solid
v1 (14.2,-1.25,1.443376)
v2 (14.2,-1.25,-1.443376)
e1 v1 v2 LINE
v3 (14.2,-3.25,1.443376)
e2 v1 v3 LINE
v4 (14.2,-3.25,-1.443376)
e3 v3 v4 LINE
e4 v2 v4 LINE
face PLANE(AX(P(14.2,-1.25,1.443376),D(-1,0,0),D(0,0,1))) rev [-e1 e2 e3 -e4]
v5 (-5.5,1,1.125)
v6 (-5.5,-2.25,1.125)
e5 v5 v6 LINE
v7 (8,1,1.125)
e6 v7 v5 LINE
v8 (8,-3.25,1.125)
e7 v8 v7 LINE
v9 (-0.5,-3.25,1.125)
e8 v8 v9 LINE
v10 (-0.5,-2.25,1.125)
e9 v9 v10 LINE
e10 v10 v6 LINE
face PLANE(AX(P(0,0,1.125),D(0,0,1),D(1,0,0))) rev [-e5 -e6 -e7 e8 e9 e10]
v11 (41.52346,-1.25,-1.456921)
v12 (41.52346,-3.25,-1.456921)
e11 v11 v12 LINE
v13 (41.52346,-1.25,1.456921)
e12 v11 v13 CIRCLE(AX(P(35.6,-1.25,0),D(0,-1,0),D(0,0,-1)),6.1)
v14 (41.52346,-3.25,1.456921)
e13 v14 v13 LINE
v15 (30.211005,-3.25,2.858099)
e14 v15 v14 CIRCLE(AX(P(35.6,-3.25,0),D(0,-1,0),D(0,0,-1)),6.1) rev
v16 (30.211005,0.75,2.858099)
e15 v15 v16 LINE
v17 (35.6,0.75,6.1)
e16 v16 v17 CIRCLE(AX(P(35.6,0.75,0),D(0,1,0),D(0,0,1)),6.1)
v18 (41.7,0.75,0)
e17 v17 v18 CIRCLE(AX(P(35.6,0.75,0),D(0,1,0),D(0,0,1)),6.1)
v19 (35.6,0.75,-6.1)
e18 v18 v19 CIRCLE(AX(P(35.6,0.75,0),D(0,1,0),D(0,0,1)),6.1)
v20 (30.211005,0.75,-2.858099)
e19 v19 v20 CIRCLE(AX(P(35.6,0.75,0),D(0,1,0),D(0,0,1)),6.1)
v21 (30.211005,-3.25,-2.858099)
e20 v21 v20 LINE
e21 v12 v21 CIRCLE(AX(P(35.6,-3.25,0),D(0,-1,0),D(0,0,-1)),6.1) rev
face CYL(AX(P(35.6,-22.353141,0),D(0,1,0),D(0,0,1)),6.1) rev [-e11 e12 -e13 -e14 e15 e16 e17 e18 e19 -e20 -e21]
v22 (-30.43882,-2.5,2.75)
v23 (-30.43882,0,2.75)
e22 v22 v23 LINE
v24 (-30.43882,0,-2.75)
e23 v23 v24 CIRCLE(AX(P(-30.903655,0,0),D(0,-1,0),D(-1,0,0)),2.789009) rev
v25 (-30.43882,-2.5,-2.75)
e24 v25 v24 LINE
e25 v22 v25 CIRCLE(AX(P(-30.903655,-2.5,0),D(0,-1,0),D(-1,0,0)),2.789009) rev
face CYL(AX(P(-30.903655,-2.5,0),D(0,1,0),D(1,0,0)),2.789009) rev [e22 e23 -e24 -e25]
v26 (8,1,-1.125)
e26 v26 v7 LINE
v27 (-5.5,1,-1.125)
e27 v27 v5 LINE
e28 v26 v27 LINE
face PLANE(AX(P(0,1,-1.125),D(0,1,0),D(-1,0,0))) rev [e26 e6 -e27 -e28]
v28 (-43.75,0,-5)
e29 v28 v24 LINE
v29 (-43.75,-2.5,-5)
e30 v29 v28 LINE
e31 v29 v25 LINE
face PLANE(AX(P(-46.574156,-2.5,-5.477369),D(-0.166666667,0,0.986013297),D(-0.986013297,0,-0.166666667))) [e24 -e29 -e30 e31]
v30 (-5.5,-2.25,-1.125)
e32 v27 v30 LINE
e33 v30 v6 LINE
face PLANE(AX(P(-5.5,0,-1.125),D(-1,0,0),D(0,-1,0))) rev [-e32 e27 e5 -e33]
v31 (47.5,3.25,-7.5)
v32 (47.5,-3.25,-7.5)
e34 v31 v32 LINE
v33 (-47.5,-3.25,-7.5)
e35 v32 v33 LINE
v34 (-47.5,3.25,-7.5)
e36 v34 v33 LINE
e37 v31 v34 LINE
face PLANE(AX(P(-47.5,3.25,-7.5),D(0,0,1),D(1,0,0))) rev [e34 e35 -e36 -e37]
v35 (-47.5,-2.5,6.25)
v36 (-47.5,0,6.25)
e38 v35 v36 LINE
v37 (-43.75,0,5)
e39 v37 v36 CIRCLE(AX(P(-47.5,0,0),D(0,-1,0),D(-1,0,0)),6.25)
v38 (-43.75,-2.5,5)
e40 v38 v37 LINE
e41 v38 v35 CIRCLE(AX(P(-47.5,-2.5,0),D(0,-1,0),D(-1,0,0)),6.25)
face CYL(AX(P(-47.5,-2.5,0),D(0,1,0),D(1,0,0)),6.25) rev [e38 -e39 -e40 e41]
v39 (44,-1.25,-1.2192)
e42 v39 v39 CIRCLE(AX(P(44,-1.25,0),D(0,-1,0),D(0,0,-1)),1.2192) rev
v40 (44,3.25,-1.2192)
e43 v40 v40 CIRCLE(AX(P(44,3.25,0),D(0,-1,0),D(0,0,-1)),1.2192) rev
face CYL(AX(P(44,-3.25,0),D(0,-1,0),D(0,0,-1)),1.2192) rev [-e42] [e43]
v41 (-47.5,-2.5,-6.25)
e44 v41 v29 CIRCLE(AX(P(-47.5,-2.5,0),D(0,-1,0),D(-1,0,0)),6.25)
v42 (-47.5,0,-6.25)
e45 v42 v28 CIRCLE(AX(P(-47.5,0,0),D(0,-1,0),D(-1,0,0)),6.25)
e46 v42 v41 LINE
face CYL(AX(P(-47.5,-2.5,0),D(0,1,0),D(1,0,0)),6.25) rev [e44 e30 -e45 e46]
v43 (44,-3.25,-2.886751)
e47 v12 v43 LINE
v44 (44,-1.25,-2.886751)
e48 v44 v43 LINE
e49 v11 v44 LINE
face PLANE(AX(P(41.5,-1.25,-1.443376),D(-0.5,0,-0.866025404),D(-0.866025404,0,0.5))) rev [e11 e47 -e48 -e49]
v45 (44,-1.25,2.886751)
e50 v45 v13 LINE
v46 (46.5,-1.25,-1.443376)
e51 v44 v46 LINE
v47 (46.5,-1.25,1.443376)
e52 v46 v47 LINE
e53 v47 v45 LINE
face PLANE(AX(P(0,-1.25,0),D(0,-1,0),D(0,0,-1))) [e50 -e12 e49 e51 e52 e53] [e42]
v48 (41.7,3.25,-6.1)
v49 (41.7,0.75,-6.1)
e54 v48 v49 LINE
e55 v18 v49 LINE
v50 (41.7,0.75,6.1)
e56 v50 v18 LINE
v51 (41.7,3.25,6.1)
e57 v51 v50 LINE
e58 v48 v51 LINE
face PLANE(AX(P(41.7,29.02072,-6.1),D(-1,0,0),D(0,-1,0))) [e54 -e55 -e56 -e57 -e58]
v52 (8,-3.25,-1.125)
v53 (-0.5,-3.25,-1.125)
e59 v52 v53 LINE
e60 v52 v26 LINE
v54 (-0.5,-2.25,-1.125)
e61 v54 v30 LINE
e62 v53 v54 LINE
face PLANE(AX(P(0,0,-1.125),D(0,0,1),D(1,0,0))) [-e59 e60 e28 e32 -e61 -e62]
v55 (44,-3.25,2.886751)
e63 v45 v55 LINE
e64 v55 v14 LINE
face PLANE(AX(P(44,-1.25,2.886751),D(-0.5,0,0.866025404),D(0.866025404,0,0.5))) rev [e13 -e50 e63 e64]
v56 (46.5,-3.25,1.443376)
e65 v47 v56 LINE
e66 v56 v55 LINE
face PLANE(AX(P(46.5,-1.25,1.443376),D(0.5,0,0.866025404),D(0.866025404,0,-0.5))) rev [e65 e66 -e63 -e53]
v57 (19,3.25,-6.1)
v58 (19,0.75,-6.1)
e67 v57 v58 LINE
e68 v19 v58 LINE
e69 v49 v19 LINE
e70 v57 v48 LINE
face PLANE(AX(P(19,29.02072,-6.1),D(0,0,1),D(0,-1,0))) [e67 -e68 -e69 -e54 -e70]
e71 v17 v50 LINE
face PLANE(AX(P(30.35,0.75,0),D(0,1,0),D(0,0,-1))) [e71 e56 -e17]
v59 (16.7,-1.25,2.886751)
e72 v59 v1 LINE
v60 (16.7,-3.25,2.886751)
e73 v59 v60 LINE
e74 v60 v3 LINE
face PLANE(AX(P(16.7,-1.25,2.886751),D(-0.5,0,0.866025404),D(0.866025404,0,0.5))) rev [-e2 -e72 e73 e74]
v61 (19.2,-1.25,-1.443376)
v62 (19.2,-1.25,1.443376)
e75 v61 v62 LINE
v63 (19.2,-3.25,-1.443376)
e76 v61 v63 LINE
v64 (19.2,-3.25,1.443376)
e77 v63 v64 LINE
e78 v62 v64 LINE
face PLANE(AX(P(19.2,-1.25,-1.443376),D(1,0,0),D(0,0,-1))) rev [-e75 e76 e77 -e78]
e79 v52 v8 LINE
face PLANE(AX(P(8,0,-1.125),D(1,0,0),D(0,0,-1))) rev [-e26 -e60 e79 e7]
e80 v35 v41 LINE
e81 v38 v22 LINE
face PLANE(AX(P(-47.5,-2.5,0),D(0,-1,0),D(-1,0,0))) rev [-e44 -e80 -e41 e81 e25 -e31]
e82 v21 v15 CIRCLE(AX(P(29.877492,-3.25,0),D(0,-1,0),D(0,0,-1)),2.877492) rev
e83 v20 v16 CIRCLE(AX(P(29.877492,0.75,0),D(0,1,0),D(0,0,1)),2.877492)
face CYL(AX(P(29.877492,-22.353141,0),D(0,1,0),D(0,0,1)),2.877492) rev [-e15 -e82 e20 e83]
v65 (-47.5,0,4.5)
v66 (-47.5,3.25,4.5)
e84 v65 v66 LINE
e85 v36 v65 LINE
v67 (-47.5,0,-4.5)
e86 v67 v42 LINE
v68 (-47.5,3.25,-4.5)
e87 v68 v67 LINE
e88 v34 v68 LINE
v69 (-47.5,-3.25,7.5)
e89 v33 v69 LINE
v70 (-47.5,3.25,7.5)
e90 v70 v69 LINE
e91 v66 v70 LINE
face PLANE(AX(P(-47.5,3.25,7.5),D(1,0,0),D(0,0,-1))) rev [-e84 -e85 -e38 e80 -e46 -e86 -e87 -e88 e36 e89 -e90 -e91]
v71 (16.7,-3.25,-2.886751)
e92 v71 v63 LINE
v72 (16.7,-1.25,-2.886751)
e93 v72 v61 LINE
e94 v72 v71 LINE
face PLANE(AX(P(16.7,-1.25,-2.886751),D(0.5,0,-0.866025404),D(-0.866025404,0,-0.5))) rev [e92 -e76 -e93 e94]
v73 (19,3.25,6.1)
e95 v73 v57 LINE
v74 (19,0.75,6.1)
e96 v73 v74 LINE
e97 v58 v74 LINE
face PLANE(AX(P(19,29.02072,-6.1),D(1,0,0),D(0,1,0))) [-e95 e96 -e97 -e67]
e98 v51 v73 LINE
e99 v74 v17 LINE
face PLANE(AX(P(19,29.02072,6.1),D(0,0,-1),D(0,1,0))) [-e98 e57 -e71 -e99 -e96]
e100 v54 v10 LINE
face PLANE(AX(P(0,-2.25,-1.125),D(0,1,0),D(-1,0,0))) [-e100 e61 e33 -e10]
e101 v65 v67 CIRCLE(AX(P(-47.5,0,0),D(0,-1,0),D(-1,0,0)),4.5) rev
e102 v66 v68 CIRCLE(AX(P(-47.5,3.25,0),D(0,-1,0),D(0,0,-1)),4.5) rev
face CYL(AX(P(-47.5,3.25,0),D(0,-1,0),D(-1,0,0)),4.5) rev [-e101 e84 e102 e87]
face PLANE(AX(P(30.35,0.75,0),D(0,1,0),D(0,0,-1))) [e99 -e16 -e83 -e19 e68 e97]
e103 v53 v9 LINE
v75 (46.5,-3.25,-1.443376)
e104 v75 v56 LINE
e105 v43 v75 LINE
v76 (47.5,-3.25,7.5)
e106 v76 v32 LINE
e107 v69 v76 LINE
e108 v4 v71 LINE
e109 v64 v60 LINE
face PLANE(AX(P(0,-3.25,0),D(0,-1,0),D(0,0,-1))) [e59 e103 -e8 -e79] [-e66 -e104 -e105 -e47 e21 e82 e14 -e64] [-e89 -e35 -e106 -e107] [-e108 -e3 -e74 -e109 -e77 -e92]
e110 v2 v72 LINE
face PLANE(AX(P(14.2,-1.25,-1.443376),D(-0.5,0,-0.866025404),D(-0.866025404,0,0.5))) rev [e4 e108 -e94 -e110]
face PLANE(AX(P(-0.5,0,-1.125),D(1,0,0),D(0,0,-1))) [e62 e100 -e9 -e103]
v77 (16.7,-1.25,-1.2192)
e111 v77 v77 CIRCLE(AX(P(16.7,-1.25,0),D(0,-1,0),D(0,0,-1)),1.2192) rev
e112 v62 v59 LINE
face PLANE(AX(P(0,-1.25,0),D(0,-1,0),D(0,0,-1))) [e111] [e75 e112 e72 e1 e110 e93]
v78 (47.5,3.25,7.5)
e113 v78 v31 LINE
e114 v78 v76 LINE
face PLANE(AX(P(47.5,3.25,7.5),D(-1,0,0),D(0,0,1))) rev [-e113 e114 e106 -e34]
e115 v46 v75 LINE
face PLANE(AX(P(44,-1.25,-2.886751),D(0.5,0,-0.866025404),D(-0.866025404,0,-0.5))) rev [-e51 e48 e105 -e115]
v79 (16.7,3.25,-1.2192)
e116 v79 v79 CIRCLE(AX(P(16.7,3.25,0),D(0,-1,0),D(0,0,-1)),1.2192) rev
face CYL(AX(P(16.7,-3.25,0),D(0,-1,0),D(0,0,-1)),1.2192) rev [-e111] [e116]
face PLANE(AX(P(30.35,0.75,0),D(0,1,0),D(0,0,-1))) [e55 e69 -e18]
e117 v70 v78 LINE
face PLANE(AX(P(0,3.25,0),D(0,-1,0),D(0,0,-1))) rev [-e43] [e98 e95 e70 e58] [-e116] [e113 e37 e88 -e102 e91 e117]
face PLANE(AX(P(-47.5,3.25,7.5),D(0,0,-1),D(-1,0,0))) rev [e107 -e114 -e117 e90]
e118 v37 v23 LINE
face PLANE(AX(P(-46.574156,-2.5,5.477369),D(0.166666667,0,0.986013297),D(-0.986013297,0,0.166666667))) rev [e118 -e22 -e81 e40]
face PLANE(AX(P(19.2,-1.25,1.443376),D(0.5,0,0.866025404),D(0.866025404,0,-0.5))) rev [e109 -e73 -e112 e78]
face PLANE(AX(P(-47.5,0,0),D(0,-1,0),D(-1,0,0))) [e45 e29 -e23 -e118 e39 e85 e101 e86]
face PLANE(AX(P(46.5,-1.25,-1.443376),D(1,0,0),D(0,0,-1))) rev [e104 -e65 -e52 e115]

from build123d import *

# Parameters (mm, degrees)
SKETCH2_W                   = 95
SKETCH2_H                   = 15
BOSS_EXTRUDE1_DEPTH         = 3.25
CAVITY1_START               = -2.5
CAVITY1_DEPTH               = 2.5
CAVITY1_START_2             = -1.5
CAVITY1_2_DEPTH             = 4.75
CAVITY1_3_DEPTH             = 1.5
CUT_EXTRUDE1_START          = -5.75
CUT_EXTRUDE1_DEPTH          = 5.75
CUT_EXTRUDE2_START          = -1
CUT_EXTRUDE2_DEPTH          = 1
F_41_0_096_DIAMETER_HOLE1_D = 2.4384
CUT_EXTRUDE4_DEPTH          = 2
CAVITY2_START               = -3.25
CAVITY2_DEPTH               = 6.5
CAVITY2_START_2             = 0.75
CAVITY2_2_DEPTH             = 2.5
SKETCH12_W                  = 22.7
SKETCH12_H                  = 12.2
SKETCH12_W_2                = 22.5
SKETCH12_H_2                = 12
CUT_EXTRUDE6_DEPTH          = 2.5
CUT_EXTRUDE7_START          = -4
CUT_EXTRUDE7_DEPTH          = 4
SKETCH15_W                  = 8.5
SKETCH15_H                  = 4.25
SKETCH15_W_2                = 5
SKETCH15_H_2                = 3.25
CUT_EXTRUDE8_DEPTH          = 1.125


# Read off the part's stored shape, not the designer's step: Cavity1, Cavity2
with BuildPart() as part:
    # Sketch2 → Boss-Extrude1 (new, symmetric)
    with BuildSketch(Plane(origin=(0, 0, 0), x_dir=(1, 0, 0), z_dir=(0, 1, 0))):
        Rectangle(SKETCH2_W, SKETCH2_H)
    extrude(amount=BOSS_EXTRUDE1_DEPTH, both=True)

    # Cavity1 outline → Cavity1 (cut)
    with BuildSketch(Plane(origin=(0, 0, 0), x_dir=(1, 0, 0), z_dir=(0, 1, 0)).offset(CAVITY1_START)):
        with BuildLine():
            ThreePointArc((-47.5, 2.875), (-44.625, 0), (-47.5, -2.875))
            Line((-47.5, -2.875), (-47.5, -3.425))
            ThreePointArc((-47.5, -3.425), (-44.075, 0), (-47.5, 3.425))
            Line((-47.5, 3.425), (-47.5, 2.875))
        make_face()
        with BuildLine():
            Line((-47.5, 6.25), (-47.5, 4.5))
            ThreePointArc((-47.5, 4.5), (-43, 0), (-47.5, -4.5))
            Line((-47.5, -4.5), (-47.5, -6.25))
            ThreePointArc((-47.5, -6.25), (-45.523576462, -5.929270613), (-43.75, -5))
            Line((-43.75, -5), (-30.438820488, -2.75))
            ThreePointArc((-30.438820488, -2.75), (-28.114646288, 0), (-30.438820488, 2.75))
            Line((-30.438820488, 2.75), (-43.75, 5))
            ThreePointArc((-43.75, 5), (-45.523576462, 5.929270613), (-47.5, 6.25))
        make_face()
    extrude(amount=CAVITY1_DEPTH, mode=Mode.SUBTRACT)

    # Cavity1 2 outline → Cavity1 2 (cut)
    with BuildSketch(Plane(origin=(0, 0, 0), x_dir=(1, 0, 0), z_dir=(0, 1, 0)).offset(CAVITY1_START_2)):
        with BuildLine():
            ThreePointArc((-47.5, 3), (-44.5, 0), (-47.5, -3))
            Line((-47.5, -3), (-47.5, -4.5))
            ThreePointArc((-47.5, -4.5), (-43, 0), (-47.5, 4.5))
            Line((-47.5, 4.5), (-47.5, 3))
        make_face()
    extrude(amount=CAVITY1_2_DEPTH, mode=Mode.SUBTRACT)

    # Cavity1 3 outline → Cavity1 3 (cut)
    with BuildSketch(Plane(origin=(0, 0, 0), x_dir=(1, 0, 0), z_dir=(0, 1, 0)).offset(CAVITY1_START_2)):
        with BuildLine():
            Line((-47.5, 2.875), (-47.5, 1.5))
            ThreePointArc((-47.5, 1.5), (-46, 0), (-47.5, -1.5))
            Line((-47.5, -1.5), (-47.5, -2.875))
            ThreePointArc((-47.5, -2.875), (-44.625, 0), (-47.5, 2.875))
        make_face()
    extrude(amount=CAVITY1_3_DEPTH, mode=Mode.SUBTRACT)

    # Sketch4 → Cut-Extrude1 (cut)
    with BuildSketch(Plane(origin=(0, 3.25, 0), x_dir=(1, 0, 0), z_dir=(0, 1, 0)).offset(CUT_EXTRUDE1_START)):
        with BuildLine():
            Line((-47.5, 3), (-47.5, -3))
            ThreePointArc((-47.5, -3), (-44.5, 0), (-47.5, 3))
        make_face()
    extrude(amount=CUT_EXTRUDE1_DEPTH, mode=Mode.SUBTRACT)

    # Sketch6 → Cut-Extrude2 (cut)
    with BuildSketch(Plane(origin=(0, -1.5, 0), x_dir=(1, 0, 0), z_dir=(0, 1, 0)).offset(CUT_EXTRUDE2_START)):
        with BuildLine():
            Line((-47.5, 4.5), (-47.5, 3.425))
            ThreePointArc((-47.5, 3.425), (-44.075, 0), (-47.5, -3.425))
            Line((-47.5, -3.425), (-47.5, -4.5))
            ThreePointArc((-47.5, -4.5), (-43, 0), (-47.5, 4.5))
        make_face()
    extrude(amount=CUT_EXTRUDE2_DEPTH, mode=Mode.SUBTRACT)

    # #41 (0.096) Diameter Hole1 (through all)
    with Locations(Plane(origin=(0, -3.25, 0), x_dir=(-1, 0, 0), z_dir=(0, -1, 0))):
        with Locations((-44, 0), (-16.7, 0)):
            Hole(F_41_0_096_DIAMETER_HOLE1_D / 2)

    # Sketch10 → Cut-Extrude4 (cut)
    with BuildSketch(Plane.XZ.offset(3.25)):
        Polygon((46.5, -1.443375673), (46.5, 1.443375673), (44, 2.886751346), (41.5, 1.443375673), (41.5, -1.443375673), (44, -2.886751346), align=None)
        Polygon((16.7, 2.886751346), (14.2, 1.443375673), (14.2, -1.443375673), (16.7, -2.886751346), (19.2, -1.443375673), (19.2, 1.443375673), align=None)
    extrude(amount=-CUT_EXTRUDE4_DEPTH, mode=Mode.SUBTRACT)

    # Cavity2 outline → Cavity2 (cut)
    with BuildSketch(Plane(origin=(0, 0, 0), x_dir=(1, 0, 0), z_dir=(0, 1, 0)).offset(CAVITY2_START)):
        with BuildLine():
            ThreePointArc((30.267317748, -2.75), (41.6, 0), (30.267317748, 2.75))
            ThreePointArc((30.267317748, 2.75), (27.1, 0), (30.267317748, -2.75))
        make_face()
    extrude(amount=CAVITY2_DEPTH, mode=Mode.SUBTRACT)

    # Cavity2 2 outline → Cavity2 2 (cut)
    with BuildSketch(Plane(origin=(0, 0, 0), x_dir=(1, 0, 0), z_dir=(0, 1, 0)).offset(CAVITY2_START_2)):
        with BuildLine():
            Line((19.1, 6), (19.1, -6))
            Line((19.1, -6), (35.6, -6))
            ThreePointArc((35.6, -6), (32.477501001, -5.123475383), (30.267317748, -2.75))
            ThreePointArc((30.267317748, -2.75), (27.1, 0), (30.267317748, 2.75))
            ThreePointArc((30.267317748, 2.75), (32.477501001, 5.123475383), (35.6, 6))
            Line((35.6, 6), (19.1, 6))
        make_face()
        with BuildLine():
            ThreePointArc((41.5, -1.090871211), (39.4376277, -4.61222437), (35.6, -6))
            Line((35.6, -6), (41.6, -6))
            Line((41.6, -6), (41.6, 0))
            ThreePointArc((41.6, 0), (41.574947699, -0.547722558), (41.5, -1.090871211))
        make_face()
        with BuildLine():
            Line((41.6, 6), (35.6, 6))
            ThreePointArc((35.6, 6), (39.4376277, 4.612224369), (41.5, 1.090871211))
            ThreePointArc((41.5, 1.090871211), (41.574947699, 0.547722558), (41.6, 0))
            Line((41.6, 0), (41.6, 6))
        make_face()
    extrude(amount=CAVITY2_2_DEPTH, mode=Mode.SUBTRACT)

    # Sketch12 → Cut-Extrude6 (cut)
    with BuildSketch(Plane(origin=(0, 0.75, 0), x_dir=(1, 0, 0), z_dir=(0, 1, 0))):
        with Locations((30.35, 0)):
            Rectangle(SKETCH12_W, SKETCH12_H)
        with Locations((30.35, 0)):
            Rectangle(SKETCH12_W_2, SKETCH12_H_2, mode=Mode.SUBTRACT)
    extrude(amount=CUT_EXTRUDE6_DEPTH, mode=Mode.SUBTRACT)

    # Sketch13 → Cut-Extrude7 (cut)
    with BuildSketch(Plane(origin=(0, 0.75, 0), x_dir=(1, 0, 0), z_dir=(0, 1, 0)).offset(CUT_EXTRUDE7_START)):
        with BuildLine():
            ThreePointArc((30.211004889, -2.858099316), (41.7, 0), (30.211004889, 2.858099316))
            ThreePointArc((30.211004889, 2.858099316), (27, 0), (30.211004889, -2.858099316))
        make_face()
        with BuildLine():
            ThreePointArc((30.267317748, 2.75), (41.6, 0), (30.267317748, -2.75))
            ThreePointArc((30.267317748, -2.75), (27.1, 0), (30.267317748, 2.75))
        make_face(mode=Mode.SUBTRACT)
    extrude(amount=CUT_EXTRUDE7_DEPTH, mode=Mode.SUBTRACT)

    # Sketch15 → Cut-Extrude8 (cut, symmetric)
    with BuildSketch(Plane.XY):
        with Locations((3.75, -1.125)):
            Rectangle(SKETCH15_W, SKETCH15_H)
        with Locations((-3, -0.625)):
            Rectangle(SKETCH15_W_2, SKETCH15_H_2)
    extrude(amount=CUT_EXTRUDE8_DEPTH, both=True, mode=Mode.SUBTRACT)


solid = part.part
